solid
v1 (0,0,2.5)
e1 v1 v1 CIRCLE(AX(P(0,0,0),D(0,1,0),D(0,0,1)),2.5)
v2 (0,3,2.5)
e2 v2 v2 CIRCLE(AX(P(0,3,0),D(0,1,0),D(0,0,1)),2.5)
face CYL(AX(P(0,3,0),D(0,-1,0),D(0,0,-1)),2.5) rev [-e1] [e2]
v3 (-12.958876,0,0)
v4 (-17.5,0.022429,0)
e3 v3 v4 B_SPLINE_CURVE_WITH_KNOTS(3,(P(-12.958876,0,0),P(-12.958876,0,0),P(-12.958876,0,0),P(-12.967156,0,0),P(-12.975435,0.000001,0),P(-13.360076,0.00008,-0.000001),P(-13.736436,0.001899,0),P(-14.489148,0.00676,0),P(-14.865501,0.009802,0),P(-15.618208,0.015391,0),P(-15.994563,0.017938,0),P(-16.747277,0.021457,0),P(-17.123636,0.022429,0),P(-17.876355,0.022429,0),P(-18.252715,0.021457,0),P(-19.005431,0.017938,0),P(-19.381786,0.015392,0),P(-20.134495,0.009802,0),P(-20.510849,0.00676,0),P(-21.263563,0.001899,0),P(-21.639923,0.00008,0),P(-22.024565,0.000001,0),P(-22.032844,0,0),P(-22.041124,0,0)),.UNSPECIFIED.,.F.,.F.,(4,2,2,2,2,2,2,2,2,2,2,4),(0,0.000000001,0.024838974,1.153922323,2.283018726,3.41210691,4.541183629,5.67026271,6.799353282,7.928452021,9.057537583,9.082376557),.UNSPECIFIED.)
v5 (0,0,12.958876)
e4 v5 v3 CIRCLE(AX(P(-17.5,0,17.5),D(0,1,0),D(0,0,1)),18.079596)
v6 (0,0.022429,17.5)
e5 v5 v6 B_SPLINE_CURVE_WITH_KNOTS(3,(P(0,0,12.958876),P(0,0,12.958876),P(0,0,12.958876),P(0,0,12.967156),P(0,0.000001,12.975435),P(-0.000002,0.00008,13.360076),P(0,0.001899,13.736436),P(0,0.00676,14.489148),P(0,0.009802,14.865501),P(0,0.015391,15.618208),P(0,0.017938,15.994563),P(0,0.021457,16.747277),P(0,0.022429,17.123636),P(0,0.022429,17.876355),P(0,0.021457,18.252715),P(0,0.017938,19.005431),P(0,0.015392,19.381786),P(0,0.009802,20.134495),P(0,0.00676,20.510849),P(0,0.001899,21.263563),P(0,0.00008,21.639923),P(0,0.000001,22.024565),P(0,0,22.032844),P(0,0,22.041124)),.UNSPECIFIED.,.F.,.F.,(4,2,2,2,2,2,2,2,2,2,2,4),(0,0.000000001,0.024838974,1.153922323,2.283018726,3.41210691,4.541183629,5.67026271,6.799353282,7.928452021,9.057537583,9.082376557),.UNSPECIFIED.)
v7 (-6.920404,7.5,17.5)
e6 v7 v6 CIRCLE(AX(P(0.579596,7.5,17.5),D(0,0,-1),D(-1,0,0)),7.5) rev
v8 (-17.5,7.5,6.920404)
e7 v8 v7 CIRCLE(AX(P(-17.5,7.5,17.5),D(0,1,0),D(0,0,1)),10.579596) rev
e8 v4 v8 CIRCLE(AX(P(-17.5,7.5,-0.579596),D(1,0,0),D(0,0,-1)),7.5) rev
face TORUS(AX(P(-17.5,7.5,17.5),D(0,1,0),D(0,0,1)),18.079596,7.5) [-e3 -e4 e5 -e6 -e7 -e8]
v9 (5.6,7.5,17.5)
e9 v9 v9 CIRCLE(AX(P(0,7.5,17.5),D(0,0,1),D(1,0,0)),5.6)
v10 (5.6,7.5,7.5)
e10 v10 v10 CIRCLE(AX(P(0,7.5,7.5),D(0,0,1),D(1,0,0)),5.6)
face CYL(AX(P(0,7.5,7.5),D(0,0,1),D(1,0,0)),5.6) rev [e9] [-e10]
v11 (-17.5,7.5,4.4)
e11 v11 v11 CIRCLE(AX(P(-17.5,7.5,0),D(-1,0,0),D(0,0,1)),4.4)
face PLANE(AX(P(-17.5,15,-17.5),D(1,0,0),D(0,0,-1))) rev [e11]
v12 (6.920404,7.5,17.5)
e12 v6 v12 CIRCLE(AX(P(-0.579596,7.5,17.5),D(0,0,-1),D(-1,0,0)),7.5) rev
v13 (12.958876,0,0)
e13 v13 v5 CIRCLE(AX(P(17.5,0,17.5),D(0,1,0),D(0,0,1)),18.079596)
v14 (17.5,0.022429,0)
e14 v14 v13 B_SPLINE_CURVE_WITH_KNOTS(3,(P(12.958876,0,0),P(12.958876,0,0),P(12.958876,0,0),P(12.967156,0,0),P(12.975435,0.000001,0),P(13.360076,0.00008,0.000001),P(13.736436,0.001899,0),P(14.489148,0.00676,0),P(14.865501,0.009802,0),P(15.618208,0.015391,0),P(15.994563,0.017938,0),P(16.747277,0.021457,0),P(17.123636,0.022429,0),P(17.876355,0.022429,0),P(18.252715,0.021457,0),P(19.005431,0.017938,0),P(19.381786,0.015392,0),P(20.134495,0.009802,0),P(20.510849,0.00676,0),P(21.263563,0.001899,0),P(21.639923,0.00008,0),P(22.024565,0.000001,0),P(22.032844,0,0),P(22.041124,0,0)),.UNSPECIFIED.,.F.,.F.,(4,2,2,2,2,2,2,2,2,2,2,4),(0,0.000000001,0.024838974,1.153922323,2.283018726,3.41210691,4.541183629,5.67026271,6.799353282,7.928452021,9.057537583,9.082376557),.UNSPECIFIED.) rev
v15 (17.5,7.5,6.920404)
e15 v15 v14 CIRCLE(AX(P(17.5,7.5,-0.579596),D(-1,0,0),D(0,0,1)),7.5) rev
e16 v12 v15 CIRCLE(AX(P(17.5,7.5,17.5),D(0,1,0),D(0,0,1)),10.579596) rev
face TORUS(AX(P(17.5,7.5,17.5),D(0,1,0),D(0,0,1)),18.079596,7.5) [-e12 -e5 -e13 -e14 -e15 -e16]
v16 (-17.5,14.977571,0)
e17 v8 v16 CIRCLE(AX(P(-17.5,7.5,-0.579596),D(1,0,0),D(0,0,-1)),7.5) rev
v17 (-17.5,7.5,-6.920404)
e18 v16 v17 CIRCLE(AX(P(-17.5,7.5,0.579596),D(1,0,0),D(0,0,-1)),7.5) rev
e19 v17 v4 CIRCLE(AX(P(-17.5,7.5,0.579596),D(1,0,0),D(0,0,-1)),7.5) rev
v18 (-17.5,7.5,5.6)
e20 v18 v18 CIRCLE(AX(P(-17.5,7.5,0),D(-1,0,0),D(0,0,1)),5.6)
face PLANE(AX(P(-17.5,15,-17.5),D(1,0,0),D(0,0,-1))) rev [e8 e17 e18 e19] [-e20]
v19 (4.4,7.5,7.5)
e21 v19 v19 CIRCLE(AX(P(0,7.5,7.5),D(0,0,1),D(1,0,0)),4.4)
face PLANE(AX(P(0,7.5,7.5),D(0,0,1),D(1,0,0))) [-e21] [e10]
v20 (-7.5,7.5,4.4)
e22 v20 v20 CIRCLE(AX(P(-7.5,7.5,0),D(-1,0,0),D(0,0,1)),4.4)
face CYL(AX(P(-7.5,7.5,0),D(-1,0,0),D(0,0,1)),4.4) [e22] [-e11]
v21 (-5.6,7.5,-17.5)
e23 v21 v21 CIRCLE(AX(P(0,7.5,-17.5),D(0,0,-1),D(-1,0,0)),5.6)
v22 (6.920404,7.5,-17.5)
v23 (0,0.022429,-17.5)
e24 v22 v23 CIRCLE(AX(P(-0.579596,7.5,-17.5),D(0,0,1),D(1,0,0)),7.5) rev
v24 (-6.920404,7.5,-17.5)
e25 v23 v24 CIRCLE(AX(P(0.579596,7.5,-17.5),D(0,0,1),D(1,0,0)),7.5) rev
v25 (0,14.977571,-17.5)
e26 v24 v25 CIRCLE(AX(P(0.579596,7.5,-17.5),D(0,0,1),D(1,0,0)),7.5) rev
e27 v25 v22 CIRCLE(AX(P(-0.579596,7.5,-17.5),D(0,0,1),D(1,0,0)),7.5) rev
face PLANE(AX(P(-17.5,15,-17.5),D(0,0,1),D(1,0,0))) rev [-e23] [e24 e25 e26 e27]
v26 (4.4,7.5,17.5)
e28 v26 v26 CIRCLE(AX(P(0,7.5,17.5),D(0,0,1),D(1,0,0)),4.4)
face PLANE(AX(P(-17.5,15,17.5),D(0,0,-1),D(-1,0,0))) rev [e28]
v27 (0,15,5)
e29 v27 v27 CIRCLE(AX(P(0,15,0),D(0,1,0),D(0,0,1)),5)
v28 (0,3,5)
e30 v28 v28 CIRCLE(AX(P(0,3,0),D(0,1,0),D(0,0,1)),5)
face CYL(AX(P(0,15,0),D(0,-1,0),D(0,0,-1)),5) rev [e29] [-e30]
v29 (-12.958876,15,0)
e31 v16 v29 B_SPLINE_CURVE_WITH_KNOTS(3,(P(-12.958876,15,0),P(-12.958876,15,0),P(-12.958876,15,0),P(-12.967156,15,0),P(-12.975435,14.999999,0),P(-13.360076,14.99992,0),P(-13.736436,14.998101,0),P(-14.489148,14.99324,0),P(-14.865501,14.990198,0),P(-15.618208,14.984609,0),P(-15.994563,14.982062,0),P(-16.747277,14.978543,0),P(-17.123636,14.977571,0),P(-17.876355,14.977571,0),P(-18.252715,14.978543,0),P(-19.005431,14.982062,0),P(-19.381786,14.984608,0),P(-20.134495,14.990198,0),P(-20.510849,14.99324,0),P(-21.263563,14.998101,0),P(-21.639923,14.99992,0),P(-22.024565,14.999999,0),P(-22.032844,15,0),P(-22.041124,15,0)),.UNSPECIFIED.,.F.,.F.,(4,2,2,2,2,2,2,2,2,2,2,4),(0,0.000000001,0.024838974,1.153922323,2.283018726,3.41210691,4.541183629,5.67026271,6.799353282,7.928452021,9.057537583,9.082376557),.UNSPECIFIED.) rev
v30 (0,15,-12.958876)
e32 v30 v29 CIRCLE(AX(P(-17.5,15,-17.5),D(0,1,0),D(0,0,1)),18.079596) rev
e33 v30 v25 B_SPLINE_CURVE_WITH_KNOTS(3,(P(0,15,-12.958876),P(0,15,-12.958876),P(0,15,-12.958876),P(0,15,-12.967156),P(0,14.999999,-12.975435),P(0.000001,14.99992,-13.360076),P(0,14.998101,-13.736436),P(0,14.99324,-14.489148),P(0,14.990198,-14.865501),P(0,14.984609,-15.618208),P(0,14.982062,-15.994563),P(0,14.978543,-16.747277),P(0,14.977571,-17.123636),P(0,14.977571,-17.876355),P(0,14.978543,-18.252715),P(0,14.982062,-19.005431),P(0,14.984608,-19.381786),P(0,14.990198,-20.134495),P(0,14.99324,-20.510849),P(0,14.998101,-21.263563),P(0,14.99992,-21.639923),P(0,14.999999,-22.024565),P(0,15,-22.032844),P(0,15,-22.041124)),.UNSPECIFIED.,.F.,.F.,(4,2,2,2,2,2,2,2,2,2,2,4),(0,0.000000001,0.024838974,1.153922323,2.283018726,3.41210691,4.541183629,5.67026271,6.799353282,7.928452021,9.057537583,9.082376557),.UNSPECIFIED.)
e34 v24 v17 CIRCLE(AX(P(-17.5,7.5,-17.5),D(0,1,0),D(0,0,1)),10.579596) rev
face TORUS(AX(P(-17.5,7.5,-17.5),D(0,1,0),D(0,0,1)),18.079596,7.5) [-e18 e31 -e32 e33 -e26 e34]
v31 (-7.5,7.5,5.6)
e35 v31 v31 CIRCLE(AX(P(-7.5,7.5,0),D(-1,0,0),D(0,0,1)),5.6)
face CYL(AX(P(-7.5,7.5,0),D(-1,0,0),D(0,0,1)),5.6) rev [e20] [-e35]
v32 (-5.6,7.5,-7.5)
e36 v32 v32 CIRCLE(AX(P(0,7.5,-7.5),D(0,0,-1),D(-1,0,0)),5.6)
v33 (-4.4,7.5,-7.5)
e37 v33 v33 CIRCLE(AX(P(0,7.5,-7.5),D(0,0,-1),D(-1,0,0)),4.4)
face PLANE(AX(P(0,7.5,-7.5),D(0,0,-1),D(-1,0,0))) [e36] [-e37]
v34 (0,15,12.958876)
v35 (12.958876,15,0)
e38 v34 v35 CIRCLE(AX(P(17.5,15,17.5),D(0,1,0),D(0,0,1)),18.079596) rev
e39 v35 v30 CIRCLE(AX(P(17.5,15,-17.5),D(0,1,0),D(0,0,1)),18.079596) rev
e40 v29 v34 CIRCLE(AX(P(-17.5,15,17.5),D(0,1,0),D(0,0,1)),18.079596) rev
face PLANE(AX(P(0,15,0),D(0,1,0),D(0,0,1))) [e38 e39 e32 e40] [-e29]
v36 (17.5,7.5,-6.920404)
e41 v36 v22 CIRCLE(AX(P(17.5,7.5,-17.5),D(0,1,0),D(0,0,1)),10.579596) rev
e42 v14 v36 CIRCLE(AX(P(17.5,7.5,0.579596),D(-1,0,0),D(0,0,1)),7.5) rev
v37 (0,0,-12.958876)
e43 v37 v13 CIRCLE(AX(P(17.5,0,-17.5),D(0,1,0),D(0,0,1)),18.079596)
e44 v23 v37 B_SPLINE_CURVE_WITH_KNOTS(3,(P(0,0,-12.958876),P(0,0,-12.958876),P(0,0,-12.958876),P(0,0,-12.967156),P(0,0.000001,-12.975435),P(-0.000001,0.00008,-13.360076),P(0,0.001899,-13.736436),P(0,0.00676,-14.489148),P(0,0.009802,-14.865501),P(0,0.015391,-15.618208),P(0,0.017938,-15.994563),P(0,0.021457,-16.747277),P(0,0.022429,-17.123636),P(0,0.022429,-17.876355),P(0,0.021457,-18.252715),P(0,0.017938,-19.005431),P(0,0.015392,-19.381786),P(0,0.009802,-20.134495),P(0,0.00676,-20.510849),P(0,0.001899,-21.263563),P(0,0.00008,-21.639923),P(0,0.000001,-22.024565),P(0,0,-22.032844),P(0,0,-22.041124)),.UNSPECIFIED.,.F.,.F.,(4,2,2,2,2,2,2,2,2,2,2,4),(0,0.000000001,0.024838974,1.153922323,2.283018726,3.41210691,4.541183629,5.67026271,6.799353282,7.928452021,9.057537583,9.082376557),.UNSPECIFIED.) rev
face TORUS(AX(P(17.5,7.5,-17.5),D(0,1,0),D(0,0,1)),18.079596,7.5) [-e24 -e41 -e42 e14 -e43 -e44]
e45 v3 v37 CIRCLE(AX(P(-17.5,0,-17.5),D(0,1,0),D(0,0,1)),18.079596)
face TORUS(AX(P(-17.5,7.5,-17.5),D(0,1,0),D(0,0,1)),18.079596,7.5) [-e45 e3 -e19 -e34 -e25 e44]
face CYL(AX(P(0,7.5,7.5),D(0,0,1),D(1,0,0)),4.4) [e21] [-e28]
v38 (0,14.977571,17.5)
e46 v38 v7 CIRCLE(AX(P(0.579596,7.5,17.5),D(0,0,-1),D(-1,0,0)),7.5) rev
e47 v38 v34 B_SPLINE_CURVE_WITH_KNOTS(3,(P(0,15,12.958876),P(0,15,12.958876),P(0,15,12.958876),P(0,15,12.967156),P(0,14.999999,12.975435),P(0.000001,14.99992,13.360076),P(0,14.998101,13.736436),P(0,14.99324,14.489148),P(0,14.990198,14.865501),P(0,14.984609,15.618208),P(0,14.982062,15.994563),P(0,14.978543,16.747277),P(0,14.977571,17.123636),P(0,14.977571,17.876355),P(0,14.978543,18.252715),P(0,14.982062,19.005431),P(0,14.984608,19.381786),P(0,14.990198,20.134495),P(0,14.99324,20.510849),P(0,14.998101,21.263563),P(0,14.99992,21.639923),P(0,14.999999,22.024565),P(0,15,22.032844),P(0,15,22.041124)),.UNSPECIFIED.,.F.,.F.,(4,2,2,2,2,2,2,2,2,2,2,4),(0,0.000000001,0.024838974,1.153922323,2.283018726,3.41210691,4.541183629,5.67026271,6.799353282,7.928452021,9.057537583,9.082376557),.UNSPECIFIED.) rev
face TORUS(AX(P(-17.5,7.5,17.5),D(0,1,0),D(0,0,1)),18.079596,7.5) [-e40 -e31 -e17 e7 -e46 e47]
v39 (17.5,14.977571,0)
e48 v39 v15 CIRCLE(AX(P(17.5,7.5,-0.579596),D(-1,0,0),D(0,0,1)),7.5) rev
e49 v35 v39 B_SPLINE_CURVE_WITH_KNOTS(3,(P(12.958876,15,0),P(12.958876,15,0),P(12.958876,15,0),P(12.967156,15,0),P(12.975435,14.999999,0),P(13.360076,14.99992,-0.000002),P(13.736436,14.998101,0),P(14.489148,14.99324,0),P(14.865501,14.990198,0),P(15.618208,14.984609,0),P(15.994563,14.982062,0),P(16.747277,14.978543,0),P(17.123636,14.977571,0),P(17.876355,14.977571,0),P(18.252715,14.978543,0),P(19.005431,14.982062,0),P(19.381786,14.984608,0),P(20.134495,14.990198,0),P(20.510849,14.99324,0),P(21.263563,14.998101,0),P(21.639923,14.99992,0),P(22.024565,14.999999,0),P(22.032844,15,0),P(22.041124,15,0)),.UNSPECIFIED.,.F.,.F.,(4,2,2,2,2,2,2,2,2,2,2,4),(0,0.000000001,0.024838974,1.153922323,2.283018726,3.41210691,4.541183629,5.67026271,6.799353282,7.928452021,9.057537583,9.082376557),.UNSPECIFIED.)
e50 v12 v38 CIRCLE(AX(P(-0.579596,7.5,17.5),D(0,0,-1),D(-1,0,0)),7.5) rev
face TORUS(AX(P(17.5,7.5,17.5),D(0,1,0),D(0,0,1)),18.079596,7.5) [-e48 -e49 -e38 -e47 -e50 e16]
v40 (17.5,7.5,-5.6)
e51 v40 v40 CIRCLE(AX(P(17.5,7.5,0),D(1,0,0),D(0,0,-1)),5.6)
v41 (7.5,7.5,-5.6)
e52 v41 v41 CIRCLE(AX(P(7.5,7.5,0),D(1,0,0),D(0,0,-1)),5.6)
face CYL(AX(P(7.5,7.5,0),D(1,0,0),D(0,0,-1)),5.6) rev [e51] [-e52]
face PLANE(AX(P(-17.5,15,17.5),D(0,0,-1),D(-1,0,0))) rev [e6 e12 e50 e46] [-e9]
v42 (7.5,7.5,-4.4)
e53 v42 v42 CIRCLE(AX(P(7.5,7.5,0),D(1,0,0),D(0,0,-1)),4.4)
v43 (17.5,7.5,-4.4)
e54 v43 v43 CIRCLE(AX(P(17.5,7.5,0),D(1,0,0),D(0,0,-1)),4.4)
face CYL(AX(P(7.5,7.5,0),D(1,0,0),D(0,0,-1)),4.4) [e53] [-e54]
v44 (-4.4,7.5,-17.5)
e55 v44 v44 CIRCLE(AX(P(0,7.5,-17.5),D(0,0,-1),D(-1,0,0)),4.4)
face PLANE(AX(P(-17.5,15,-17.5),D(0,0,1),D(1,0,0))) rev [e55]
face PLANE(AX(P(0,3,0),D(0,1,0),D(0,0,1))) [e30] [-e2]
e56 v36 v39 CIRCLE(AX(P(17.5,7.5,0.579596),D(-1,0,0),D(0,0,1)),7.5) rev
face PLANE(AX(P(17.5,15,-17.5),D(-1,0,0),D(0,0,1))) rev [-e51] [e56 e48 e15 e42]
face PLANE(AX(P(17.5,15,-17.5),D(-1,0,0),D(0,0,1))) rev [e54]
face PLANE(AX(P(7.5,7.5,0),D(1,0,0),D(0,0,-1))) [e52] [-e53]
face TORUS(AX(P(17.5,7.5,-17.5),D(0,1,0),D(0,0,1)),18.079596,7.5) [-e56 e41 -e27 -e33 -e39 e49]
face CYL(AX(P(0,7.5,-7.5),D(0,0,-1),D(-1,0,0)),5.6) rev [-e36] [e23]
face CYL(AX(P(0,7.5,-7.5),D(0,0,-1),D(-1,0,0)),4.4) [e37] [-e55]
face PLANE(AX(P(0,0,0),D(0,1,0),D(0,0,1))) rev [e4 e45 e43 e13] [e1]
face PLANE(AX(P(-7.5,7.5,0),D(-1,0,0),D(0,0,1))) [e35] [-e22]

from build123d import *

# Parameters (mm, degrees)
SKETCH3_W                   = 35
SKETCH3_H                   = 35
SKETCH3_R                   = 5
Y_KSEKLIK_EKSTR_ZYON1_DEPTH = 15
IZIM1_R                     = 5.6
IZIM1_R_2                   = 4.4
KES_EKSTR_ZYON2_DEPTH       = 10
DAIRESEL_KAPLAMA1_COUNT     = 4
KES_EKSTR_ZYON3_DEPTH       = 29.939592257
DAIRESEL_KAPLAMA3_COUNT     = 4
RADYUS3_R                   = 7.5
IZIM4_R                     = 5
IZIM4_R_2                   = 2.5
Y_KSEKLIK_EKSTR_ZYON2_DEPTH = 3


with BuildPart() as part:
    # Sketch3 → Yükseklik-Ekstrüzyon1 (new body)
    with BuildSketch(Plane(origin=(0, 0, 0), x_dir=(1, 0, 0), z_dir=(0, 1, 0))):
        Rectangle(SKETCH3_W, SKETCH3_H)
        with Locations(Location((0, 0, 0), (0, 0, 270))):
            Circle(SKETCH3_R, mode=Mode.SUBTRACT)
    extrude(amount=Y_KSEKLIK_EKSTR_ZYON1_DEPTH)

    # Çizim1 → Kes-Ekstrüzyon2 (cut)
    with BuildSketch(Plane.XY.offset(17.5)):
        with Locations((0, 7.5)):
            Circle(IZIM1_R)
        with Locations((0, 7.5)):
            Circle(IZIM1_R_2, mode=Mode.SUBTRACT)
    kes_ekstr_zyon2 = extrude(amount=-KES_EKSTR_ZYON2_DEPTH, mode=Mode.SUBTRACT)

    # Dairesel Kaplama1: Kes-Ekstrüzyon2 ×4 about axis
    dairesel_kaplama1_axis = Axis((0, 0, 0), (0, 1, 0))
    for i in range(1, DAIRESEL_KAPLAMA1_COUNT):
        add(kes_ekstr_zyon2.rotate(dairesel_kaplama1_axis, i * 360 / DAIRESEL_KAPLAMA1_COUNT), mode=Mode.SUBTRACT)

    # Çizim3 → Kes-Ekstrüzyon3 (cut, through all)
    with BuildSketch(Plane(origin=(0, 15, 0), x_dir=(1, 0, 0), z_dir=(0, 1, 0))):
        with BuildLine():
            ThreePointArc((-6.920403545, -17.5), (-10.019095604, -10.019095604), (-17.5, -6.920403545))
            Line((-17.5, -6.920403545), (-17.5, -17.5))
            Line((-17.5, -17.5), (-6.920403545, -17.5))
        make_face()
    kes_ekstr_zyon3 = extrude(amount=-KES_EKSTR_ZYON3_DEPTH, mode=Mode.SUBTRACT)

    # Dairesel Kaplama3: Kes-Ekstrüzyon3 ×4 about axis
    dairesel_kaplama3_axis = Axis((0, 0, 0), (0, 1, 0))
    for i in range(1, DAIRESEL_KAPLAMA3_COUNT):
        add(kes_ekstr_zyon3.rotate(dairesel_kaplama3_axis, i * 360 / DAIRESEL_KAPLAMA3_COUNT), mode=Mode.SUBTRACT)

    # Radyus3
    # the kernel refuses this fillet: 7.5 mm, written as the material it takes off along each edge
    with BuildSketch(Plane(origin=(-17.5, 15, 17.5), x_dir=(1, 0, 0), z_dir=(0, 0, 1))) as radyus3_piece_1:
        with BuildLine():
            CenterArc((10.579596455 + RADYUS3_R, -RADYUS3_R), RADYUS3_R, 90, 90)
            Line((10.579596455, -RADYUS3_R), (10.579596455 - RADYUS3_R * 0.02, -RADYUS3_R))
            Line((10.579596455 - RADYUS3_R * 0.02, -RADYUS3_R), (10.579596455 - RADYUS3_R * 0.02, RADYUS3_R * 0.02))
            Line((10.579596455 - RADYUS3_R * 0.02, RADYUS3_R * 0.02), (10.579596455 + RADYUS3_R, RADYUS3_R * 0.02))
            Line((10.579596455 + RADYUS3_R, RADYUS3_R * 0.02), (10.579596455 + RADYUS3_R, 0))
        make_face()
    radyus3_piece_1_solid = revolve(axis=Axis((-17.5, 15, 17.5), (0, 1, 0)), revolution_arc=90, mode=Mode.PRIVATE)
    with BuildSketch(Plane(origin=(-17.5, 0, 17.5), x_dir=(1, 0, 0), z_dir=(0, 0, 1))) as radyus3_piece_2:
        with BuildLine():
            CenterArc((10.579596455 + RADYUS3_R, RADYUS3_R), RADYUS3_R, 180, 90)
            Line((10.579596455, RADYUS3_R), (10.579596455 - RADYUS3_R * 0.02, RADYUS3_R))
            Line((10.579596455 - RADYUS3_R * 0.02, RADYUS3_R), (10.579596455 - RADYUS3_R * 0.02, -RADYUS3_R * 0.02))
            Line((10.579596455 - RADYUS3_R * 0.02, -RADYUS3_R * 0.02), (10.579596455 + RADYUS3_R, -RADYUS3_R * 0.02))
            Line((10.579596455 + RADYUS3_R, -RADYUS3_R * 0.02), (10.579596455 + RADYUS3_R, 0))
        make_face()
    radyus3_piece_2_solid = revolve(axis=Axis((-17.5, 0, 17.5), (0, 1, 0)), revolution_arc=90, mode=Mode.PRIVATE)
    with BuildSketch(Plane(origin=(-17.5, 15, -17.5), x_dir=(0, 0, 1), z_dir=(-1, 0, 0))) as radyus3_piece_3:
        with BuildLine():
            CenterArc((10.579596455 + RADYUS3_R, -RADYUS3_R), RADYUS3_R, 90, 90)
            Line((10.579596455, -RADYUS3_R), (10.579596455 - RADYUS3_R * 0.02, -RADYUS3_R))
            Line((10.579596455 - RADYUS3_R * 0.02, -RADYUS3_R), (10.579596455 - RADYUS3_R * 0.02, RADYUS3_R * 0.02))
            Line((10.579596455 - RADYUS3_R * 0.02, RADYUS3_R * 0.02), (10.579596455 + RADYUS3_R, RADYUS3_R * 0.02))
            Line((10.579596455 + RADYUS3_R, RADYUS3_R * 0.02), (10.579596455 + RADYUS3_R, 0))
        make_face()
    radyus3_piece_3_solid = revolve(axis=Axis((-17.5, 15, -17.5), (0, 1, 0)), revolution_arc=90, mode=Mode.PRIVATE)
    with BuildSketch(Plane(origin=(17.5, 15, -17.5), x_dir=(-1, 0, 0), z_dir=(0, 0, -1))) as radyus3_piece_4:
        with BuildLine():
            CenterArc((10.579596455 + RADYUS3_R, -RADYUS3_R), RADYUS3_R, 90, 90)
            Line((10.579596455 + RADYUS3_R, 0), (10.579596455 + RADYUS3_R, RADYUS3_R * 0.02))
            Line((10.579596455 + RADYUS3_R, RADYUS3_R * 0.02), (10.579596455 - RADYUS3_R * 0.02, RADYUS3_R * 0.02))
            Line((10.579596455 - RADYUS3_R * 0.02, RADYUS3_R * 0.02), (10.579596455 - RADYUS3_R * 0.02, -RADYUS3_R))
            Line((10.579596455 - RADYUS3_R * 0.02, -RADYUS3_R), (10.579596455, -RADYUS3_R))
        make_face()
    radyus3_piece_4_solid = revolve(axis=Axis((17.5, 15, -17.5), (0, 1, 0)), revolution_arc=90, mode=Mode.PRIVATE)
    with BuildSketch(Plane(origin=(17.5, 15, 17.5), x_dir=(0, 0, -1), z_dir=(1, 0, 0))) as radyus3_piece_5:
        with BuildLine():
            CenterArc((10.579596455 + RADYUS3_R, -RADYUS3_R), RADYUS3_R, 90, 90)
            Line((10.579596455, -RADYUS3_R), (10.579596455 - RADYUS3_R * 0.02, -RADYUS3_R))
            Line((10.579596455 - RADYUS3_R * 0.02, -RADYUS3_R), (10.579596455 - RADYUS3_R * 0.02, RADYUS3_R * 0.02))
            Line((10.579596455 - RADYUS3_R * 0.02, RADYUS3_R * 0.02), (10.579596455 + RADYUS3_R, RADYUS3_R * 0.02))
            Line((10.579596455 + RADYUS3_R, RADYUS3_R * 0.02), (10.579596455 + RADYUS3_R, 0))
        make_face()
    radyus3_piece_5_solid = revolve(axis=Axis((17.5, 15, 17.5), (0, 1, 0)), revolution_arc=90, mode=Mode.PRIVATE)
    with BuildSketch(Plane(origin=(17.5, 0, 17.5), x_dir=(0, 0, -1), z_dir=(1, 0, 0))) as radyus3_piece_6:
        with BuildLine():
            CenterArc((10.579596455 + RADYUS3_R, RADYUS3_R), RADYUS3_R, 180, 90)
            Line((10.579596455, RADYUS3_R), (10.579596455 - RADYUS3_R * 0.02, RADYUS3_R))
            Line((10.579596455 - RADYUS3_R * 0.02, RADYUS3_R), (10.579596455 - RADYUS3_R * 0.02, -RADYUS3_R * 0.02))
            Line((10.579596455 - RADYUS3_R * 0.02, -RADYUS3_R * 0.02), (10.579596455 + RADYUS3_R, -RADYUS3_R * 0.02))
            Line((10.579596455 + RADYUS3_R, -RADYUS3_R * 0.02), (10.579596455 + RADYUS3_R, 0))
        make_face()
    radyus3_piece_6_solid = revolve(axis=Axis((17.5, 0, 17.5), (0, 1, 0)), revolution_arc=90, mode=Mode.PRIVATE)
    with BuildSketch(Plane(origin=(17.5, 0, -17.5), x_dir=(-1, 0, 0), z_dir=(0, 0, -1))) as radyus3_piece_7:
        with BuildLine():
            CenterArc((10.579596455 + RADYUS3_R, RADYUS3_R), RADYUS3_R, 180, 90)
            Line((10.579596455, RADYUS3_R), (10.579596455 - RADYUS3_R * 0.02, RADYUS3_R))
            Line((10.579596455 - RADYUS3_R * 0.02, RADYUS3_R), (10.579596455 - RADYUS3_R * 0.02, -RADYUS3_R * 0.02))
            Line((10.579596455 - RADYUS3_R * 0.02, -RADYUS3_R * 0.02), (10.579596455 + RADYUS3_R, -RADYUS3_R * 0.02))
            Line((10.579596455 + RADYUS3_R, -RADYUS3_R * 0.02), (10.579596455 + RADYUS3_R, 0))
        make_face()
    radyus3_piece_7_solid = revolve(axis=Axis((17.5, 0, -17.5), (0, 1, 0)), revolution_arc=90, mode=Mode.PRIVATE)
    with BuildSketch(Plane(origin=(-17.5, 0, -17.5), x_dir=(0, 0, 1), z_dir=(-1, 0, 0))) as radyus3_piece_8:
        with BuildLine():
            CenterArc((10.579596455 + RADYUS3_R, RADYUS3_R), RADYUS3_R, 180, 90)
            Line((10.579596455, RADYUS3_R), (10.579596455 - RADYUS3_R * 0.02, RADYUS3_R))
            Line((10.579596455 - RADYUS3_R * 0.02, RADYUS3_R), (10.579596455 - RADYUS3_R * 0.02, -RADYUS3_R * 0.02))
            Line((10.579596455 - RADYUS3_R * 0.02, -RADYUS3_R * 0.02), (10.579596455 + RADYUS3_R, -RADYUS3_R * 0.02))
            Line((10.579596455 + RADYUS3_R, -RADYUS3_R * 0.02), (10.579596455 + RADYUS3_R, 0))
        make_face()
    radyus3_piece_8_solid = revolve(axis=Axis((-17.5, 0, -17.5), (0, 1, 0)), revolution_arc=90, mode=Mode.PRIVATE)
    add([radyus3_piece_1_solid, radyus3_piece_2_solid, radyus3_piece_3_solid, radyus3_piece_4_solid, radyus3_piece_5_solid, radyus3_piece_6_solid, radyus3_piece_7_solid, radyus3_piece_8_solid], mode=Mode.SUBTRACT)

    # Çizim4 → Yükseklik-Ekstrüzyon2 (add)
    with BuildSketch(Plane(origin=(0, 0, 0), x_dir=(1, 0, 0), z_dir=(0, 1, 0))):
        with Locations(Location((0, 0, 0), (0, 0, 270))):
            Circle(IZIM4_R)
        with Locations(Location((0, 0, 0), (0, 0, 270))):
            Circle(IZIM4_R_2, mode=Mode.SUBTRACT)
    extrude(amount=Y_KSEKLIK_EKSTR_ZYON2_DEPTH)


solid = part.part
